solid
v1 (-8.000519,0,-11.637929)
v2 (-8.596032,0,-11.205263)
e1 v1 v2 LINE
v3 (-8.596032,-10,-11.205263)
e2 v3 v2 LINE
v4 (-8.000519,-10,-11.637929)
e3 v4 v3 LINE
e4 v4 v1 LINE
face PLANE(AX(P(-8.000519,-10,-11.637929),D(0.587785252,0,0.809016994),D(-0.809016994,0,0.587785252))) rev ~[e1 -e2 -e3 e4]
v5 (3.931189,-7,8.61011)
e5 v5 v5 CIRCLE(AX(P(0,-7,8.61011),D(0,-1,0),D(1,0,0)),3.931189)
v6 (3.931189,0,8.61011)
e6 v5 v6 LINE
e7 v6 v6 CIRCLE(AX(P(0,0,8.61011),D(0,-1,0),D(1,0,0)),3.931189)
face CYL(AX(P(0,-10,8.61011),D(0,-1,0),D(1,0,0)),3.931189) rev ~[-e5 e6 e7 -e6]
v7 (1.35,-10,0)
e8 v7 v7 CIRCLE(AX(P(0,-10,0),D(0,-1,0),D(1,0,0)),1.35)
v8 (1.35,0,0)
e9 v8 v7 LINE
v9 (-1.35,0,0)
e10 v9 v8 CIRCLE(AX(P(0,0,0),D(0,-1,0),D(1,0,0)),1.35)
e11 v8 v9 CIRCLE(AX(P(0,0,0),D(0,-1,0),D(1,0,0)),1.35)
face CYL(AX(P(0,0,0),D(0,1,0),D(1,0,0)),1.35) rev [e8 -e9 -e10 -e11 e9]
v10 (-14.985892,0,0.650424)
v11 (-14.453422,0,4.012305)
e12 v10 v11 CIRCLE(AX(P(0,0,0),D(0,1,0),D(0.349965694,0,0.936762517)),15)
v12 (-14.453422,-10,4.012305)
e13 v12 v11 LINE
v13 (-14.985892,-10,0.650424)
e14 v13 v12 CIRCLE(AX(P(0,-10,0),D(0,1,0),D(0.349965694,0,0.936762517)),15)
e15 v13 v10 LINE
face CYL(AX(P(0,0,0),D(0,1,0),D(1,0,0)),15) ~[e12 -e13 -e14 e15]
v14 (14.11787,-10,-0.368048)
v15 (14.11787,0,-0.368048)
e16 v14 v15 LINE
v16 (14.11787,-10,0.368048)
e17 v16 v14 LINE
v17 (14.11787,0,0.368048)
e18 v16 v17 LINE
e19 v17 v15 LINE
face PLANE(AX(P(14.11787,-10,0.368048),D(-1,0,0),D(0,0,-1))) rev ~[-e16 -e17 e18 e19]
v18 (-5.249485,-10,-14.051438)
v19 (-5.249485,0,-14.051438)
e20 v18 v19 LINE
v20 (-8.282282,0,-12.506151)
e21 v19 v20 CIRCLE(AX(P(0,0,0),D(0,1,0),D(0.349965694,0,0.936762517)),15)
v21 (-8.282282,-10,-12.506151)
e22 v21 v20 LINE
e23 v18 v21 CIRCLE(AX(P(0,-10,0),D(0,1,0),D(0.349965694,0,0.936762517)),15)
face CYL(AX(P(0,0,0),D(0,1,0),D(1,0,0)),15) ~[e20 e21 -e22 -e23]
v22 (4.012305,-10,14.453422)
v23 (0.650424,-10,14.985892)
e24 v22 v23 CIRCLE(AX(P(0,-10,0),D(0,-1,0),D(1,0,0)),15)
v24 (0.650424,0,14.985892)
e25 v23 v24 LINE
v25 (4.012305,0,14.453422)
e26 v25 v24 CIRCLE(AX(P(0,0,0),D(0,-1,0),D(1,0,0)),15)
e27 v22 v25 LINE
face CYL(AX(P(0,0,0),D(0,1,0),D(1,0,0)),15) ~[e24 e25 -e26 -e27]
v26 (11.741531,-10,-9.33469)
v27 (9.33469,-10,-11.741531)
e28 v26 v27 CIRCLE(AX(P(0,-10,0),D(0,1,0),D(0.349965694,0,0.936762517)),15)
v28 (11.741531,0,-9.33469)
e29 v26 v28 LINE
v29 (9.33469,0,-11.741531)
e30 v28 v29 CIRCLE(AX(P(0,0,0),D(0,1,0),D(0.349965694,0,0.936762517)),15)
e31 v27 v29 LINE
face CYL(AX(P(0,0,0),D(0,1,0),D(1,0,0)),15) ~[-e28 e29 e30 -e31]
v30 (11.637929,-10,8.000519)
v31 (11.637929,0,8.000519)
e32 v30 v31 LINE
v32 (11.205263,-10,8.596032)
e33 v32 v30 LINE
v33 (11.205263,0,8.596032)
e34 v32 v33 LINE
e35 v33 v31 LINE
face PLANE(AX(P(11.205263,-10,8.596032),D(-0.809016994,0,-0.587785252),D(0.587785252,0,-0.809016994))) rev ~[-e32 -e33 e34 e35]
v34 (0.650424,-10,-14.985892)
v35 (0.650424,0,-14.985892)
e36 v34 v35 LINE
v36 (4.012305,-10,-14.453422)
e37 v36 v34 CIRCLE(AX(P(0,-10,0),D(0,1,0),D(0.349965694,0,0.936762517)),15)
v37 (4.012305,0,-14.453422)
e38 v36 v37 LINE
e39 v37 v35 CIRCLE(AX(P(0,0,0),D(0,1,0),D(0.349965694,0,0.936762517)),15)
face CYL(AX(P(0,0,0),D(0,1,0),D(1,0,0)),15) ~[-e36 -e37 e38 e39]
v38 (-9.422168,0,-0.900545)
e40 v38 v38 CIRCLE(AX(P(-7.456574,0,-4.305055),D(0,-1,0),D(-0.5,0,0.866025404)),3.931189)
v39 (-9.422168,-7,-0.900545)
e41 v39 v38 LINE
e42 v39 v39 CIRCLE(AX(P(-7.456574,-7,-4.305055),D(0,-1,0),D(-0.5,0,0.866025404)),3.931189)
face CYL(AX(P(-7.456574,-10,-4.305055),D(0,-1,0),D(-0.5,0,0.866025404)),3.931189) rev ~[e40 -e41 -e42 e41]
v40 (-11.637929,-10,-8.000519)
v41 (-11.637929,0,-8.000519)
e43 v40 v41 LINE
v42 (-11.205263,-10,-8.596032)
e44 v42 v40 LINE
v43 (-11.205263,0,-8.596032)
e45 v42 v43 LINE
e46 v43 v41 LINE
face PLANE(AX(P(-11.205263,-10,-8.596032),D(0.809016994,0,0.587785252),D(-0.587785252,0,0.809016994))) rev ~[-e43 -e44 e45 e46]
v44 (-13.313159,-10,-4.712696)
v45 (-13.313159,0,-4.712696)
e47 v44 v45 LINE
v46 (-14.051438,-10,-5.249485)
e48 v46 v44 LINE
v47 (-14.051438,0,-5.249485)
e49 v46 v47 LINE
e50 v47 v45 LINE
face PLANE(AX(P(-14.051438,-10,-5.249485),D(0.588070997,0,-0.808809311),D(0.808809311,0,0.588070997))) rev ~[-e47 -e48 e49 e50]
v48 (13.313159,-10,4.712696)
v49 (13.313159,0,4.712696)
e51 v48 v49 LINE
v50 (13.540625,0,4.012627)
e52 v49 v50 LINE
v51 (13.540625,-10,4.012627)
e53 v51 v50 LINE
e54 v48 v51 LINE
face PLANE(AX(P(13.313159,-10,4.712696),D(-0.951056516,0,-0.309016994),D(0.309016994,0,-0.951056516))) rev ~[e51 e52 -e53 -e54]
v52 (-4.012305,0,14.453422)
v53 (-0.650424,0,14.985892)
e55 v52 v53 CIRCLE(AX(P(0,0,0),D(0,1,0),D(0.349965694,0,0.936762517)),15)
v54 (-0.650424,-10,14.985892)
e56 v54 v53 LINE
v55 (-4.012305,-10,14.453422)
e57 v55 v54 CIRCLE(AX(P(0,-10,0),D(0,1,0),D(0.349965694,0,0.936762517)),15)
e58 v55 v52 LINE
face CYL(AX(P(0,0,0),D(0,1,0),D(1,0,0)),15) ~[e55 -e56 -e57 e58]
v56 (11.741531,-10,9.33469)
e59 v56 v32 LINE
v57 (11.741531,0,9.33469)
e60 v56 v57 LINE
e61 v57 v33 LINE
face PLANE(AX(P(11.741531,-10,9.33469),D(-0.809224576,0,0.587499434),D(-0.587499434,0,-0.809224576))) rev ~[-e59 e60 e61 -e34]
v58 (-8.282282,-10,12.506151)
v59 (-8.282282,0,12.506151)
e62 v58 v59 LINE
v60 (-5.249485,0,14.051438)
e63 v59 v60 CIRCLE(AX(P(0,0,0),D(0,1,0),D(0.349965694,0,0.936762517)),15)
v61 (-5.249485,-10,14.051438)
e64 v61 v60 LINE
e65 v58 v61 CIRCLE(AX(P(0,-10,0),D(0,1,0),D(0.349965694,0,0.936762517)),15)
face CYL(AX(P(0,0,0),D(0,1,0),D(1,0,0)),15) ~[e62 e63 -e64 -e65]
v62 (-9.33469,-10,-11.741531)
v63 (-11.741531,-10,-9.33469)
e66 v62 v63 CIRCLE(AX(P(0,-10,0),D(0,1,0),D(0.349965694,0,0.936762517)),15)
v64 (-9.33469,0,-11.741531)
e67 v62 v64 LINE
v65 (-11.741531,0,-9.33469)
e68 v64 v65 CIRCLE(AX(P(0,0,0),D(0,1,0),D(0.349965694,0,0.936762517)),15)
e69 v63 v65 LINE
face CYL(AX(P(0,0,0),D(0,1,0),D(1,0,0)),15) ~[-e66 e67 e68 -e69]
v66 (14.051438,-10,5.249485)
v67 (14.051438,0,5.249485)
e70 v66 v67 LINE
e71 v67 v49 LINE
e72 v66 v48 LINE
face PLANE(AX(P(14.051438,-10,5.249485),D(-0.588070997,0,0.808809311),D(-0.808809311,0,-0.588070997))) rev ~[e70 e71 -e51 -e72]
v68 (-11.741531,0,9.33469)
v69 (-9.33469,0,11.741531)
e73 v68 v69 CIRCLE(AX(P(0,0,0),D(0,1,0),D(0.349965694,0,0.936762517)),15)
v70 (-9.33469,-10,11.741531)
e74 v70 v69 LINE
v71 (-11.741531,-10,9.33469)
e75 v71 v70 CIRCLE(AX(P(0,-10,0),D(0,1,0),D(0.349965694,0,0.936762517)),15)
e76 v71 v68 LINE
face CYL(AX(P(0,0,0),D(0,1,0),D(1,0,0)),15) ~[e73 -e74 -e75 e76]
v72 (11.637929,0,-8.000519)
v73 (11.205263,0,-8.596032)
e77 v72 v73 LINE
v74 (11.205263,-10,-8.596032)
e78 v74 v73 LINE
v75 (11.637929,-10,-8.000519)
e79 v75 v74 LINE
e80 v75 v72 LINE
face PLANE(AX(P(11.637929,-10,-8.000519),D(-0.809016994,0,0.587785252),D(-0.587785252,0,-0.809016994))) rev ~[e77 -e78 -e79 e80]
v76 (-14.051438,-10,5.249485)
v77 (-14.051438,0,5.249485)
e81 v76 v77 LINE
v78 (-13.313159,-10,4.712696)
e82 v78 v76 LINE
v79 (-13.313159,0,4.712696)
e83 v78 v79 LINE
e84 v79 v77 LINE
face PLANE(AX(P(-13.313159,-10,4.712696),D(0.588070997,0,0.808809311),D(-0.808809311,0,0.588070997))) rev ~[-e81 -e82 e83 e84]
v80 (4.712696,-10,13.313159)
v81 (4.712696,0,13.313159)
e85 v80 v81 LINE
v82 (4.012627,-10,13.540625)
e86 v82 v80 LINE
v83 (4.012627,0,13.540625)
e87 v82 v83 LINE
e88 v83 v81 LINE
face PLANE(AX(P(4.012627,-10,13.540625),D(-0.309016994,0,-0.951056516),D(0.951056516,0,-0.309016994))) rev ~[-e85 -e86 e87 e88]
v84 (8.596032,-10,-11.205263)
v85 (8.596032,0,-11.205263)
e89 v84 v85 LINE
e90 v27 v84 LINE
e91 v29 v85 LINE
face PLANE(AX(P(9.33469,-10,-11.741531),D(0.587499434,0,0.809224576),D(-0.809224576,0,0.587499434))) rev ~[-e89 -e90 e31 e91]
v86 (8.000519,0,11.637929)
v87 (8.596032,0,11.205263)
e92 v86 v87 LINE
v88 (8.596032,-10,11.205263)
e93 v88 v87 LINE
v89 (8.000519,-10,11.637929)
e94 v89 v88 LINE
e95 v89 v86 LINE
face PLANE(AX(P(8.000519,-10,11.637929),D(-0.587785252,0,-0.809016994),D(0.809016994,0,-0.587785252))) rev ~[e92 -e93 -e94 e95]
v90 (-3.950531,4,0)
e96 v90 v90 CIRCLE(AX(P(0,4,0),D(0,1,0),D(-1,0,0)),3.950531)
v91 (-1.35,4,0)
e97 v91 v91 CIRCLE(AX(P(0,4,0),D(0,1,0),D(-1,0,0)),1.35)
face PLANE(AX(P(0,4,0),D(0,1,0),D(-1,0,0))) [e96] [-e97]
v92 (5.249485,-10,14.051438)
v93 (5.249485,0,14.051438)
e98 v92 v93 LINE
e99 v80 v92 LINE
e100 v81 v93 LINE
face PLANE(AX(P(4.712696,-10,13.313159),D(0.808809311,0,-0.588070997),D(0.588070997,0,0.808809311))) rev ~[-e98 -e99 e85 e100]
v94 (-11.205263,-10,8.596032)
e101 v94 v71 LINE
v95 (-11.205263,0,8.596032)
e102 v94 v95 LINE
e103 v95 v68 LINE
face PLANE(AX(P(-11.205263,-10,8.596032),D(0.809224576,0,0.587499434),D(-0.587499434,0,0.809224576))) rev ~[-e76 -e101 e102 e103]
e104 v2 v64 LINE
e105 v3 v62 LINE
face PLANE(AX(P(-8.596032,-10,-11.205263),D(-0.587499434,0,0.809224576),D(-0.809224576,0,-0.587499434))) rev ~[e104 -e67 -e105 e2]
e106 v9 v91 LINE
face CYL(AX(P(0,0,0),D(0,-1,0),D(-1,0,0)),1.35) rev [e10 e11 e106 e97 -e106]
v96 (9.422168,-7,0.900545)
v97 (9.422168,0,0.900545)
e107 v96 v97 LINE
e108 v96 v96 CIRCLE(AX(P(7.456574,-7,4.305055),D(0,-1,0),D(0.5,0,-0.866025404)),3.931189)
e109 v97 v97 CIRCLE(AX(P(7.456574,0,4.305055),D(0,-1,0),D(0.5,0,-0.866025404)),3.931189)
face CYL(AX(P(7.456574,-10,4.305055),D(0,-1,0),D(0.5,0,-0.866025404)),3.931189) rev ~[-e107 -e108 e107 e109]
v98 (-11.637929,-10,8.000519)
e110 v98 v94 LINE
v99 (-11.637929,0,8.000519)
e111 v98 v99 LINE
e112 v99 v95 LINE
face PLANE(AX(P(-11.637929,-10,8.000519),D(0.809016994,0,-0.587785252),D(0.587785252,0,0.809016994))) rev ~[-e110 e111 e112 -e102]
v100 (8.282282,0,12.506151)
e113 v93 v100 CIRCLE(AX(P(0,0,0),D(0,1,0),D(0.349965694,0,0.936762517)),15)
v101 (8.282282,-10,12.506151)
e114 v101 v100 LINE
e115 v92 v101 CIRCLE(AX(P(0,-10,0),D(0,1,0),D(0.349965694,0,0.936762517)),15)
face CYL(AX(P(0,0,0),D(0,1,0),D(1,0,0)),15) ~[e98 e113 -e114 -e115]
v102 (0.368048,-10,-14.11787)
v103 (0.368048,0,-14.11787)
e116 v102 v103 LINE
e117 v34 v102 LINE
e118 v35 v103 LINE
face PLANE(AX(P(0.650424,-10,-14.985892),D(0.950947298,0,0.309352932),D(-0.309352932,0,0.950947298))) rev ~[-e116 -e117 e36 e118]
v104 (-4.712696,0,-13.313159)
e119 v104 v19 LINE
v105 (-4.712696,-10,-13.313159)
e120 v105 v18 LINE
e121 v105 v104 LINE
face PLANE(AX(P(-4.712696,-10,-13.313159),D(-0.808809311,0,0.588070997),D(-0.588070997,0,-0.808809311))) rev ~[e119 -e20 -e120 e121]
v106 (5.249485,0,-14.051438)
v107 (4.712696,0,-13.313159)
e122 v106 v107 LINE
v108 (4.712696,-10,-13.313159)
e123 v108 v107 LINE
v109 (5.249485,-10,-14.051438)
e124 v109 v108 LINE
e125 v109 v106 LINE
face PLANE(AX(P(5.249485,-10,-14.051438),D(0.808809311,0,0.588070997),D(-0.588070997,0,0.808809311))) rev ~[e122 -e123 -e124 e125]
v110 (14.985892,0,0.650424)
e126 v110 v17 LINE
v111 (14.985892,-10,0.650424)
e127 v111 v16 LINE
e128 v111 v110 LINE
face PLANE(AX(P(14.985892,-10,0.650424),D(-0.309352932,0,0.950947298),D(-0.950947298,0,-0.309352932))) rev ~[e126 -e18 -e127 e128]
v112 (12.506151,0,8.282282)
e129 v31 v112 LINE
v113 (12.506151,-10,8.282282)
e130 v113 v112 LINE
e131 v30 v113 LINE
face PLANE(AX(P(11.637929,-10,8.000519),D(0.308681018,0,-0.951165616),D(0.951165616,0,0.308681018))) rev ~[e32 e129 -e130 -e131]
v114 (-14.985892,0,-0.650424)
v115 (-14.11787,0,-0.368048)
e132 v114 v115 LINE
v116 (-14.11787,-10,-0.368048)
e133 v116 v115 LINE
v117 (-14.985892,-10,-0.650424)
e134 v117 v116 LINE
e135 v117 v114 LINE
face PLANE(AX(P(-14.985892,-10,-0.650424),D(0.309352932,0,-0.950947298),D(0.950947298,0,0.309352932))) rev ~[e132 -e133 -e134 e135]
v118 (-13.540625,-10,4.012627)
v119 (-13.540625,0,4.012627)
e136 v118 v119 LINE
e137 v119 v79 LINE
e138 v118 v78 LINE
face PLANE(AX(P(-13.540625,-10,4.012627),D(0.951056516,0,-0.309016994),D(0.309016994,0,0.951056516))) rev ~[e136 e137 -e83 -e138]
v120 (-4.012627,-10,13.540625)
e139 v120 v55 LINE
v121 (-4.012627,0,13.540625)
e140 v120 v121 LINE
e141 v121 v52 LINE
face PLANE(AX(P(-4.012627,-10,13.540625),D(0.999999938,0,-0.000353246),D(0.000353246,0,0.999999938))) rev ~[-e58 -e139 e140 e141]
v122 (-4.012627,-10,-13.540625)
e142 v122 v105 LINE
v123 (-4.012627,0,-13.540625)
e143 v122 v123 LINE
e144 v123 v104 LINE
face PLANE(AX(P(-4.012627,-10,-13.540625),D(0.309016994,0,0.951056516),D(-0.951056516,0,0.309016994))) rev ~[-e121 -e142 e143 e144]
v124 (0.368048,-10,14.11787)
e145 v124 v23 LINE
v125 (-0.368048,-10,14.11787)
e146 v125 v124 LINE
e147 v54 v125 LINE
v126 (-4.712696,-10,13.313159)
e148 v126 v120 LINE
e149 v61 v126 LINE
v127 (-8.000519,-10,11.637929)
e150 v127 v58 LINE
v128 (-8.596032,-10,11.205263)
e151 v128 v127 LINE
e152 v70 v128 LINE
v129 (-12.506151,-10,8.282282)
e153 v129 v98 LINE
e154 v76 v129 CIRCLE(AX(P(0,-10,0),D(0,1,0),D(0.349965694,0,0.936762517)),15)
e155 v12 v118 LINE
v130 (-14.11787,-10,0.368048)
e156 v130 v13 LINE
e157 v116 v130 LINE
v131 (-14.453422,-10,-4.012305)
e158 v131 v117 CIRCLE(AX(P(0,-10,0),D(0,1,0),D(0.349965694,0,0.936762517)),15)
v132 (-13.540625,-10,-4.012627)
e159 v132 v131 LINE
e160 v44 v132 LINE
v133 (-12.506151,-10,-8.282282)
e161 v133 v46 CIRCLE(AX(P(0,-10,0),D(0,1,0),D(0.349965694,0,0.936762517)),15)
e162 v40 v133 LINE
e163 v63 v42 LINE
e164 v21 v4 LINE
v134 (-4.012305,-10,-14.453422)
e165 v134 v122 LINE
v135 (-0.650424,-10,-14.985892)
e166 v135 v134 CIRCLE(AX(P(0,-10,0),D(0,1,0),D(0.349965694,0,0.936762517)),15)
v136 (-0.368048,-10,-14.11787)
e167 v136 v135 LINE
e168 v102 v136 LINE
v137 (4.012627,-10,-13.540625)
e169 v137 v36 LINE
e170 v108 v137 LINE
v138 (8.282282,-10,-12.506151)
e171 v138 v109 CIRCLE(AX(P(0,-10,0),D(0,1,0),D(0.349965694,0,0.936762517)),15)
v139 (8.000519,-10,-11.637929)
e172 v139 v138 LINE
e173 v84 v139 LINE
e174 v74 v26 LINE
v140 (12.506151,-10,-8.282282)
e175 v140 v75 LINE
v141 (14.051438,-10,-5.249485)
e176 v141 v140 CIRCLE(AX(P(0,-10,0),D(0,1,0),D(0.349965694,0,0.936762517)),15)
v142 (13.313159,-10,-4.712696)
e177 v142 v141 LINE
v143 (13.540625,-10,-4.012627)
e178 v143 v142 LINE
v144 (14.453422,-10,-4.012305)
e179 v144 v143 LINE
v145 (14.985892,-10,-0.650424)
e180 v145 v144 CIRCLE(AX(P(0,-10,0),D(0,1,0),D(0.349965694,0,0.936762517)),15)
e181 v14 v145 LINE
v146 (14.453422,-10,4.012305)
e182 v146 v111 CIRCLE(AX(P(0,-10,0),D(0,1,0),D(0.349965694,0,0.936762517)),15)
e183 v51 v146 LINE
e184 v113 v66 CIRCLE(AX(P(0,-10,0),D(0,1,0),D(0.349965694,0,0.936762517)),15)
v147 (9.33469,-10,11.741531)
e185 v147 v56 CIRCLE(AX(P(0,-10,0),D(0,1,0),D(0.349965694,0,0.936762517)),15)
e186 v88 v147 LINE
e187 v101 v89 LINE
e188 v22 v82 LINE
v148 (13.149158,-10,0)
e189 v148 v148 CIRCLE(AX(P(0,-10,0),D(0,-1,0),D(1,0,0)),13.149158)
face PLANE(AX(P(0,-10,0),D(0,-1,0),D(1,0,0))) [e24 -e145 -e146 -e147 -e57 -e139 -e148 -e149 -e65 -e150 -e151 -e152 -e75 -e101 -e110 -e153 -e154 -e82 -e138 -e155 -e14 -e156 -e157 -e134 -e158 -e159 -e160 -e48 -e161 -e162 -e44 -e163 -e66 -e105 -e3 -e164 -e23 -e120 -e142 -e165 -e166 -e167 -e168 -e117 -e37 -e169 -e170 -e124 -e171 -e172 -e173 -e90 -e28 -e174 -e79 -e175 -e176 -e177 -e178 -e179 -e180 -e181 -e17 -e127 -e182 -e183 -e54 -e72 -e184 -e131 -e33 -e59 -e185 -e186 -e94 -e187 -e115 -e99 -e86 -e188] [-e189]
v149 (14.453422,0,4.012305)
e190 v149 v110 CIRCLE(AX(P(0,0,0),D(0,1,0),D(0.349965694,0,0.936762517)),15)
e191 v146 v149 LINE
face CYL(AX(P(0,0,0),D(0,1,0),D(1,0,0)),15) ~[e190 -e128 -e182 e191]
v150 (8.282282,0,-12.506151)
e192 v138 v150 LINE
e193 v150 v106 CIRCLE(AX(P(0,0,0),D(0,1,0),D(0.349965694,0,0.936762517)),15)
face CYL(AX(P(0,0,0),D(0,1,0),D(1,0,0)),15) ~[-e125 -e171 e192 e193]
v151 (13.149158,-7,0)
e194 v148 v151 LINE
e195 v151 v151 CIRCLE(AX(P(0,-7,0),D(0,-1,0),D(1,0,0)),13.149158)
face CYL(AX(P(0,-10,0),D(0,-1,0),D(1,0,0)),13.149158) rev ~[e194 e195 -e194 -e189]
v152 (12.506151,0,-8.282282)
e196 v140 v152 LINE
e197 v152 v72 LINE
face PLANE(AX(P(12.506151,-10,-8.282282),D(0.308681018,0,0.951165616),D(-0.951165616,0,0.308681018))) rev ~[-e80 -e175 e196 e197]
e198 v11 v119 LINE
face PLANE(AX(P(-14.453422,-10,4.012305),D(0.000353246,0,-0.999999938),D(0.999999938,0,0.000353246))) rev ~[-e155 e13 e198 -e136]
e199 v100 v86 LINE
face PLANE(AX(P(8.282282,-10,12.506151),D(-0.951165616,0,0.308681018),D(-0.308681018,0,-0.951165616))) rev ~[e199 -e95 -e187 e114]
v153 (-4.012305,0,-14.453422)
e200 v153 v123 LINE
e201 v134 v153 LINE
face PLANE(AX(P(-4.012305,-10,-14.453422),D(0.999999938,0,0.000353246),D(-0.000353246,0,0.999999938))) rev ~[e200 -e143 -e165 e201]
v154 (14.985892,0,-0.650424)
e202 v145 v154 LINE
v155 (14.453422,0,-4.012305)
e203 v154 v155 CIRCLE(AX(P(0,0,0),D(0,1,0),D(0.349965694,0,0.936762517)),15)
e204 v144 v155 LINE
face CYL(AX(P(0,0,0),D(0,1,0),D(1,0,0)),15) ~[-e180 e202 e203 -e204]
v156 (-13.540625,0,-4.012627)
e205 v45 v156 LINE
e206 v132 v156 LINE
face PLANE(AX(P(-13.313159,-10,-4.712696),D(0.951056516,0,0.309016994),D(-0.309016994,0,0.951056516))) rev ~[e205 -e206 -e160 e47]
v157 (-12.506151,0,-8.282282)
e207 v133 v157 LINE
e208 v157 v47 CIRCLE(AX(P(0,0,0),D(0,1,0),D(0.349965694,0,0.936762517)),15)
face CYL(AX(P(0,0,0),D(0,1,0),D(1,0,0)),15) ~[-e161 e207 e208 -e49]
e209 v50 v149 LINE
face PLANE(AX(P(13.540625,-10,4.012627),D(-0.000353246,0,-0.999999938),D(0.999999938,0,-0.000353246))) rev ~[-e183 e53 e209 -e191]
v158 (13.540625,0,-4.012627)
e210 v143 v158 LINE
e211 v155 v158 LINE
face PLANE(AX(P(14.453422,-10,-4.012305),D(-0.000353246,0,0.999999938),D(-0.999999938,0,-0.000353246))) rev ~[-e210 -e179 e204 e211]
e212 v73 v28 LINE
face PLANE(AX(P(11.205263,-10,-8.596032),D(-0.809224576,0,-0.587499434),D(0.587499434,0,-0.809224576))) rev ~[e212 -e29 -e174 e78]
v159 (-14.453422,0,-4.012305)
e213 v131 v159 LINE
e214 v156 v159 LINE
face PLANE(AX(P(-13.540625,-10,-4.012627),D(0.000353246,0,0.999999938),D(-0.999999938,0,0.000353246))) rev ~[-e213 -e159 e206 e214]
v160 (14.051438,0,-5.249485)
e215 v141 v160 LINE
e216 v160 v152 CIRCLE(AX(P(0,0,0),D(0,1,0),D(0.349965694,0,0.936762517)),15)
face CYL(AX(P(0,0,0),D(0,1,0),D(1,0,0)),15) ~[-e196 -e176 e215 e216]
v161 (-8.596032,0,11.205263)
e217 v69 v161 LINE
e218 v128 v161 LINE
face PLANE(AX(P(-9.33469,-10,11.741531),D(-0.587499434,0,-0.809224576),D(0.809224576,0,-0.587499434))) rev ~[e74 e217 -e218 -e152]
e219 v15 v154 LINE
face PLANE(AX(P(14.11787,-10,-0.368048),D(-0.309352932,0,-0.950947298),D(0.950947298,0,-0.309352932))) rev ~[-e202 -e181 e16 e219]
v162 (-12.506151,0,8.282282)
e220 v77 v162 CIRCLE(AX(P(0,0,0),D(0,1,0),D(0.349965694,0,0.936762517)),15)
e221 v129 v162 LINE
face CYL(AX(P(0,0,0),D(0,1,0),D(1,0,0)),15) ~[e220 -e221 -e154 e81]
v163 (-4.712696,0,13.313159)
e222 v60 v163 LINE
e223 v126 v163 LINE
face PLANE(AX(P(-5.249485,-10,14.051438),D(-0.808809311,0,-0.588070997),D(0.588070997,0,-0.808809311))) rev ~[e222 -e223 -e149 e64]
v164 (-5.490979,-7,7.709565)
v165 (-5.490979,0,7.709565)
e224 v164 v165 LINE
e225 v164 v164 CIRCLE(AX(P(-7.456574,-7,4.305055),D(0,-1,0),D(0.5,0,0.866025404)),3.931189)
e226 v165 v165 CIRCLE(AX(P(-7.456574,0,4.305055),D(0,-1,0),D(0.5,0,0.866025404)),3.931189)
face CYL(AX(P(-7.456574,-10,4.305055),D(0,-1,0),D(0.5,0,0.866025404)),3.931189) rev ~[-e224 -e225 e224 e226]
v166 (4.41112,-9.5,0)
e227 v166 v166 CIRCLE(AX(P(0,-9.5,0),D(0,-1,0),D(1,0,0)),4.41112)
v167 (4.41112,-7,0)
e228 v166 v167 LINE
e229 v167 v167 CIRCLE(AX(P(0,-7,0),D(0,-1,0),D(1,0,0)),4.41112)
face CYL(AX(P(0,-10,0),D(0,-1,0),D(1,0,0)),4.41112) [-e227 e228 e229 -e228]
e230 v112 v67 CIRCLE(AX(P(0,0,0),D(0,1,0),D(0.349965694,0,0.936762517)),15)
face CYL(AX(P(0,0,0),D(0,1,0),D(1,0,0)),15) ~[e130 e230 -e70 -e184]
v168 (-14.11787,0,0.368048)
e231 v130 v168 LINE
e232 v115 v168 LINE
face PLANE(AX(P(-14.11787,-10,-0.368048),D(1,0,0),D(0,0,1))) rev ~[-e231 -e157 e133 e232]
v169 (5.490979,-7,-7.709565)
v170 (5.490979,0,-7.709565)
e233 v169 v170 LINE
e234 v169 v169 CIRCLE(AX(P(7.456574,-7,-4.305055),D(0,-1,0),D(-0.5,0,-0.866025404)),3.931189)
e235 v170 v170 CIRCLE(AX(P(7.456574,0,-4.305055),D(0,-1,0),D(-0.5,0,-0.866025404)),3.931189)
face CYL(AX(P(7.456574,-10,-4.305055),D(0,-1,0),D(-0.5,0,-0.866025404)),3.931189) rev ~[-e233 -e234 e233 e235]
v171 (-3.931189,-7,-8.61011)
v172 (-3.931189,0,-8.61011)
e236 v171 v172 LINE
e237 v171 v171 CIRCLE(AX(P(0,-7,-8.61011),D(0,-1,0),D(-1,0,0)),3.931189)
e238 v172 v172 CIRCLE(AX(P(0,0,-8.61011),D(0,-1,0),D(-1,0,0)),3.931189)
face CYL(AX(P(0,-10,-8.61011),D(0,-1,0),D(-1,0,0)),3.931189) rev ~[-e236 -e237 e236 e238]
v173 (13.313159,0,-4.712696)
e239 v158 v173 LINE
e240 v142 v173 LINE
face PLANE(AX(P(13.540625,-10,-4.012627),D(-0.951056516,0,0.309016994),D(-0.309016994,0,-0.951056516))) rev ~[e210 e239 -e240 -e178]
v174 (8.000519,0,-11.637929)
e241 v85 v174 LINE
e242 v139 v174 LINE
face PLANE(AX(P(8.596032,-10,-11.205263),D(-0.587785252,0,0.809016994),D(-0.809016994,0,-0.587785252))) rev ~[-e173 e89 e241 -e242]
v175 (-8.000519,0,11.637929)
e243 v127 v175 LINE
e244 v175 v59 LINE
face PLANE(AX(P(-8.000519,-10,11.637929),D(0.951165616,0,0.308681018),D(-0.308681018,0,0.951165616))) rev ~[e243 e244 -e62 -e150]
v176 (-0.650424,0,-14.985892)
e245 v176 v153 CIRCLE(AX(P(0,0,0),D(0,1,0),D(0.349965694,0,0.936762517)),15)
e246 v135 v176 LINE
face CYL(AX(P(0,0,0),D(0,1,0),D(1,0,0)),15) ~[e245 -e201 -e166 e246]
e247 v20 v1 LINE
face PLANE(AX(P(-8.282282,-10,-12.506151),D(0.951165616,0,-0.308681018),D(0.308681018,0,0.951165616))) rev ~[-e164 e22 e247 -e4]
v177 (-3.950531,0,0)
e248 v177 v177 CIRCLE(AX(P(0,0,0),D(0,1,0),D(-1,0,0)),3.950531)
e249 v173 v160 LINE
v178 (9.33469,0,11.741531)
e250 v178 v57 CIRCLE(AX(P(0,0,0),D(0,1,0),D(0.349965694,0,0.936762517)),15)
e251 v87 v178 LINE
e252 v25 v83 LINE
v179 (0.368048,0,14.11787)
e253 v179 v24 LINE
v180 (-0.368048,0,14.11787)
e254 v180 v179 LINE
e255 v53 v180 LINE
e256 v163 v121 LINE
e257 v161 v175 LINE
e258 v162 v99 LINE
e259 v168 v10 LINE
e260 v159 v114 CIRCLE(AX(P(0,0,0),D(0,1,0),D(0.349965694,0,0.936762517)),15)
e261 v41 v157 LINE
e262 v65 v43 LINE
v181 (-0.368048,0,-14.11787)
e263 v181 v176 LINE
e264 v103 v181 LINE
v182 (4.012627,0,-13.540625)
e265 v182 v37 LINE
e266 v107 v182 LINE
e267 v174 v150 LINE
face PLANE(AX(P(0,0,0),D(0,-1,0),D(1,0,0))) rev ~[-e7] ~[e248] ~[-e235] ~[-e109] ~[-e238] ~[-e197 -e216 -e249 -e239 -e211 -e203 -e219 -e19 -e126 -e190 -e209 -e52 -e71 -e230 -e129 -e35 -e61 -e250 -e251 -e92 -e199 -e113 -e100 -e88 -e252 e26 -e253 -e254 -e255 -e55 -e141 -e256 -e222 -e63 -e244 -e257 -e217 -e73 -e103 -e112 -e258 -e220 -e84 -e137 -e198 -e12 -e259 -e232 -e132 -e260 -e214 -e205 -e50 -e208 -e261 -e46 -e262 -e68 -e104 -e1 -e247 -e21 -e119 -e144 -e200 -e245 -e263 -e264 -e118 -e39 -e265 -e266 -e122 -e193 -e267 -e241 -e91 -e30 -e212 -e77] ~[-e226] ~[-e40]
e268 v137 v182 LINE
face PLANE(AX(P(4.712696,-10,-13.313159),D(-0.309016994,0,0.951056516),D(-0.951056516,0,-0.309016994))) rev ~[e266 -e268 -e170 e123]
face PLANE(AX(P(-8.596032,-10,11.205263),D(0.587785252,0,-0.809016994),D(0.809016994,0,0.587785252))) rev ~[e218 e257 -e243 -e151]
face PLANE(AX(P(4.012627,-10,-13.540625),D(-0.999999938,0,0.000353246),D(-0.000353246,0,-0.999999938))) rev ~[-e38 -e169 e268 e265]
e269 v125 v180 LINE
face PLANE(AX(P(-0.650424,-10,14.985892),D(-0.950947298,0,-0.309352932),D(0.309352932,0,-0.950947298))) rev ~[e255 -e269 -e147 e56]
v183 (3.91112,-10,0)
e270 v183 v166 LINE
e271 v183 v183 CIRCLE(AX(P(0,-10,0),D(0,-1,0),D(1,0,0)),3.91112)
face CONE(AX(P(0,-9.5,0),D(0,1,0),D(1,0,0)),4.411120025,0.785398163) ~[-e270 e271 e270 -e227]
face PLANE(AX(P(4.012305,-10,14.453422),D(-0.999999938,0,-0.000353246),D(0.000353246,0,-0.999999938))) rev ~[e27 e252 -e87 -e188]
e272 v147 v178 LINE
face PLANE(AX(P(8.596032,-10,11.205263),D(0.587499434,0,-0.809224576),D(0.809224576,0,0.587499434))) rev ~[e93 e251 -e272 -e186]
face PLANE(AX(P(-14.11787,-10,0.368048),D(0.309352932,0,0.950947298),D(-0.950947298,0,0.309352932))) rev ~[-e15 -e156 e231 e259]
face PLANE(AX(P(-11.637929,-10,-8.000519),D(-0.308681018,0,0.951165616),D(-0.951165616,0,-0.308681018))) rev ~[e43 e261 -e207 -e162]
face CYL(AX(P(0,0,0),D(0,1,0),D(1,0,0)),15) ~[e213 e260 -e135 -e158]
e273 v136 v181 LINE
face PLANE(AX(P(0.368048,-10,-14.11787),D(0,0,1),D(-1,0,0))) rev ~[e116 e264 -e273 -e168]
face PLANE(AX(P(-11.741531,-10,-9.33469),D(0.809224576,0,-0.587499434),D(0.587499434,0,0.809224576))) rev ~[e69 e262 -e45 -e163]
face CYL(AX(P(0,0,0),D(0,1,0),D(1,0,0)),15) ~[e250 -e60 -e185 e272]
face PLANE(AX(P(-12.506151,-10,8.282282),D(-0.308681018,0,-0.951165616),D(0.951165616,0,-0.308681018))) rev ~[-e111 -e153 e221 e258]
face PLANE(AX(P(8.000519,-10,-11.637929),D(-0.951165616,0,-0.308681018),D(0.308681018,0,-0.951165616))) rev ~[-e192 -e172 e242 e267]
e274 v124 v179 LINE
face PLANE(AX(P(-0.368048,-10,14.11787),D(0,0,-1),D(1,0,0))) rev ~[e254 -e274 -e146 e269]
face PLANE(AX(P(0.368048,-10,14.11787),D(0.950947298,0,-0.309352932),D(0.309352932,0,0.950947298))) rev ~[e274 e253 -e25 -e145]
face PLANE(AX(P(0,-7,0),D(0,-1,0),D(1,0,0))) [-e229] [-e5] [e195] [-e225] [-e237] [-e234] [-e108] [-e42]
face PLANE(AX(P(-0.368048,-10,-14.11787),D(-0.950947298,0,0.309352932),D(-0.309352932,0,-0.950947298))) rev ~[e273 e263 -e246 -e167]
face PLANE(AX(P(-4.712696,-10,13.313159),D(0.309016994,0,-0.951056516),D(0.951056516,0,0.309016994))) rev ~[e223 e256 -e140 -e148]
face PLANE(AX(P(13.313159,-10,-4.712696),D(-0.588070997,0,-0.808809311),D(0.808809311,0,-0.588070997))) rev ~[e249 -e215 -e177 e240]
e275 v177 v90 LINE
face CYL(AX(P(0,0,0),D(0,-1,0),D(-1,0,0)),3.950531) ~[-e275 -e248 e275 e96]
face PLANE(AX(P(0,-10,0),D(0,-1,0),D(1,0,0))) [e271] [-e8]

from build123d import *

# Parameters (mm, degrees)
F0_R            = 15
F0_R_2          = 1.35
F1_DEPTH        = 10
F3_R            = 3.9311890732
F4_DEPTH        = 25
F4_COPIES_COUNT = 6
F2_R            = 13.1491583338
F2_R_2          = 4.4111200255
F5_DEPTH        = 3
F6_SIZE         = 0.5
F8_DEPTH        = 10
F9_COUNT        = 20
F10_R           = 3.9505307448
F10_R_2         = 1.35
F11_DEPTH       = 4


# Not quite as in the source:
# - a pattern or mirror of a feature is missing from the dataset's text; its kind, count and spacing are read off the source's solid
# - a feature names something its author has since deleted; it is built from what else it names


with BuildPart() as f1:
    # F0 (on Front) → F1 (new body)
    with BuildSketch(Plane.XZ):
        Circle(F0_R)
        Circle(F0_R_2, mode=Mode.SUBTRACT)
    extrude(amount=F1_DEPTH)

    # F3 (on face) → F4 (cut)
    with BuildSketch(Plane.XZ.offset(10)):
        with Locations((0, 8.6101097986)):
            Circle(F3_R)
    f4 = extrude(amount=-F4_DEPTH, mode=Mode.SUBTRACT)

    # F4_copies: F4 ×6 about axis
    f4_copies_axis = Axis((0, 0, 0), (0, 1, 0))
    for i in range(1, F4_COPIES_COUNT):
        add(f4.rotate(f4_copies_axis, i * 360 / F4_COPIES_COUNT), mode=Mode.SUBTRACT)

    # F2 (on face) → F5 (cut)
    with BuildSketch(Plane.XZ.offset(10)):
        Circle(F2_R)
        Circle(F2_R_2, mode=Mode.SUBTRACT)
    extrude(amount=-F5_DEPTH, mode=Mode.SUBTRACT)

    # F6
    f6_edges = [f1.edges().sort_by_distance(p)[0] for p in [
        (-4.41112, -10, 0),
    ]]
    chamfer(f6_edges, length=F6_SIZE)

    # F7 (on face) → F8 (cut)
    with BuildSketch(Plane.XZ.offset(10)):
        with BuildLine():
            ThreePointArc((0.6504242485, 14.9858916417), (0, 15), (-0.6504242485, 14.9858916417))
            Line((-0.6504242485, 14.9858916417), (-0.3680477384, 14.1178695485))
            Line((-0.3680477384, 14.1178695485), (0, 14.1178695485))
            Line((0, 14.1178695485), (0.3680477384, 14.1178695485))
            Line((0.3680477384, 14.1178695485), (0.6504242485, 14.9858916417))
        make_face()
    f8 = extrude(amount=-F8_DEPTH, mode=Mode.SUBTRACT)

    # F9: F8 ×20 about axis
    f9_axis = Axis((0, 0, 0), (0, 1, 0))
    for i in range(1, F9_COUNT):
        add(f8.rotate(f9_axis, i * 360 / F9_COUNT), mode=Mode.SUBTRACT)

    # F10 (on face) → F11 (join)
    with BuildSketch(Plane(origin=(0, 0, 0), x_dir=(-1, 0, 0), z_dir=(0, 1, 0))):
        Circle(F10_R)
        Circle(F10_R_2, mode=Mode.SUBTRACT)
    extrude(amount=F11_DEPTH)


solid = f1.part
